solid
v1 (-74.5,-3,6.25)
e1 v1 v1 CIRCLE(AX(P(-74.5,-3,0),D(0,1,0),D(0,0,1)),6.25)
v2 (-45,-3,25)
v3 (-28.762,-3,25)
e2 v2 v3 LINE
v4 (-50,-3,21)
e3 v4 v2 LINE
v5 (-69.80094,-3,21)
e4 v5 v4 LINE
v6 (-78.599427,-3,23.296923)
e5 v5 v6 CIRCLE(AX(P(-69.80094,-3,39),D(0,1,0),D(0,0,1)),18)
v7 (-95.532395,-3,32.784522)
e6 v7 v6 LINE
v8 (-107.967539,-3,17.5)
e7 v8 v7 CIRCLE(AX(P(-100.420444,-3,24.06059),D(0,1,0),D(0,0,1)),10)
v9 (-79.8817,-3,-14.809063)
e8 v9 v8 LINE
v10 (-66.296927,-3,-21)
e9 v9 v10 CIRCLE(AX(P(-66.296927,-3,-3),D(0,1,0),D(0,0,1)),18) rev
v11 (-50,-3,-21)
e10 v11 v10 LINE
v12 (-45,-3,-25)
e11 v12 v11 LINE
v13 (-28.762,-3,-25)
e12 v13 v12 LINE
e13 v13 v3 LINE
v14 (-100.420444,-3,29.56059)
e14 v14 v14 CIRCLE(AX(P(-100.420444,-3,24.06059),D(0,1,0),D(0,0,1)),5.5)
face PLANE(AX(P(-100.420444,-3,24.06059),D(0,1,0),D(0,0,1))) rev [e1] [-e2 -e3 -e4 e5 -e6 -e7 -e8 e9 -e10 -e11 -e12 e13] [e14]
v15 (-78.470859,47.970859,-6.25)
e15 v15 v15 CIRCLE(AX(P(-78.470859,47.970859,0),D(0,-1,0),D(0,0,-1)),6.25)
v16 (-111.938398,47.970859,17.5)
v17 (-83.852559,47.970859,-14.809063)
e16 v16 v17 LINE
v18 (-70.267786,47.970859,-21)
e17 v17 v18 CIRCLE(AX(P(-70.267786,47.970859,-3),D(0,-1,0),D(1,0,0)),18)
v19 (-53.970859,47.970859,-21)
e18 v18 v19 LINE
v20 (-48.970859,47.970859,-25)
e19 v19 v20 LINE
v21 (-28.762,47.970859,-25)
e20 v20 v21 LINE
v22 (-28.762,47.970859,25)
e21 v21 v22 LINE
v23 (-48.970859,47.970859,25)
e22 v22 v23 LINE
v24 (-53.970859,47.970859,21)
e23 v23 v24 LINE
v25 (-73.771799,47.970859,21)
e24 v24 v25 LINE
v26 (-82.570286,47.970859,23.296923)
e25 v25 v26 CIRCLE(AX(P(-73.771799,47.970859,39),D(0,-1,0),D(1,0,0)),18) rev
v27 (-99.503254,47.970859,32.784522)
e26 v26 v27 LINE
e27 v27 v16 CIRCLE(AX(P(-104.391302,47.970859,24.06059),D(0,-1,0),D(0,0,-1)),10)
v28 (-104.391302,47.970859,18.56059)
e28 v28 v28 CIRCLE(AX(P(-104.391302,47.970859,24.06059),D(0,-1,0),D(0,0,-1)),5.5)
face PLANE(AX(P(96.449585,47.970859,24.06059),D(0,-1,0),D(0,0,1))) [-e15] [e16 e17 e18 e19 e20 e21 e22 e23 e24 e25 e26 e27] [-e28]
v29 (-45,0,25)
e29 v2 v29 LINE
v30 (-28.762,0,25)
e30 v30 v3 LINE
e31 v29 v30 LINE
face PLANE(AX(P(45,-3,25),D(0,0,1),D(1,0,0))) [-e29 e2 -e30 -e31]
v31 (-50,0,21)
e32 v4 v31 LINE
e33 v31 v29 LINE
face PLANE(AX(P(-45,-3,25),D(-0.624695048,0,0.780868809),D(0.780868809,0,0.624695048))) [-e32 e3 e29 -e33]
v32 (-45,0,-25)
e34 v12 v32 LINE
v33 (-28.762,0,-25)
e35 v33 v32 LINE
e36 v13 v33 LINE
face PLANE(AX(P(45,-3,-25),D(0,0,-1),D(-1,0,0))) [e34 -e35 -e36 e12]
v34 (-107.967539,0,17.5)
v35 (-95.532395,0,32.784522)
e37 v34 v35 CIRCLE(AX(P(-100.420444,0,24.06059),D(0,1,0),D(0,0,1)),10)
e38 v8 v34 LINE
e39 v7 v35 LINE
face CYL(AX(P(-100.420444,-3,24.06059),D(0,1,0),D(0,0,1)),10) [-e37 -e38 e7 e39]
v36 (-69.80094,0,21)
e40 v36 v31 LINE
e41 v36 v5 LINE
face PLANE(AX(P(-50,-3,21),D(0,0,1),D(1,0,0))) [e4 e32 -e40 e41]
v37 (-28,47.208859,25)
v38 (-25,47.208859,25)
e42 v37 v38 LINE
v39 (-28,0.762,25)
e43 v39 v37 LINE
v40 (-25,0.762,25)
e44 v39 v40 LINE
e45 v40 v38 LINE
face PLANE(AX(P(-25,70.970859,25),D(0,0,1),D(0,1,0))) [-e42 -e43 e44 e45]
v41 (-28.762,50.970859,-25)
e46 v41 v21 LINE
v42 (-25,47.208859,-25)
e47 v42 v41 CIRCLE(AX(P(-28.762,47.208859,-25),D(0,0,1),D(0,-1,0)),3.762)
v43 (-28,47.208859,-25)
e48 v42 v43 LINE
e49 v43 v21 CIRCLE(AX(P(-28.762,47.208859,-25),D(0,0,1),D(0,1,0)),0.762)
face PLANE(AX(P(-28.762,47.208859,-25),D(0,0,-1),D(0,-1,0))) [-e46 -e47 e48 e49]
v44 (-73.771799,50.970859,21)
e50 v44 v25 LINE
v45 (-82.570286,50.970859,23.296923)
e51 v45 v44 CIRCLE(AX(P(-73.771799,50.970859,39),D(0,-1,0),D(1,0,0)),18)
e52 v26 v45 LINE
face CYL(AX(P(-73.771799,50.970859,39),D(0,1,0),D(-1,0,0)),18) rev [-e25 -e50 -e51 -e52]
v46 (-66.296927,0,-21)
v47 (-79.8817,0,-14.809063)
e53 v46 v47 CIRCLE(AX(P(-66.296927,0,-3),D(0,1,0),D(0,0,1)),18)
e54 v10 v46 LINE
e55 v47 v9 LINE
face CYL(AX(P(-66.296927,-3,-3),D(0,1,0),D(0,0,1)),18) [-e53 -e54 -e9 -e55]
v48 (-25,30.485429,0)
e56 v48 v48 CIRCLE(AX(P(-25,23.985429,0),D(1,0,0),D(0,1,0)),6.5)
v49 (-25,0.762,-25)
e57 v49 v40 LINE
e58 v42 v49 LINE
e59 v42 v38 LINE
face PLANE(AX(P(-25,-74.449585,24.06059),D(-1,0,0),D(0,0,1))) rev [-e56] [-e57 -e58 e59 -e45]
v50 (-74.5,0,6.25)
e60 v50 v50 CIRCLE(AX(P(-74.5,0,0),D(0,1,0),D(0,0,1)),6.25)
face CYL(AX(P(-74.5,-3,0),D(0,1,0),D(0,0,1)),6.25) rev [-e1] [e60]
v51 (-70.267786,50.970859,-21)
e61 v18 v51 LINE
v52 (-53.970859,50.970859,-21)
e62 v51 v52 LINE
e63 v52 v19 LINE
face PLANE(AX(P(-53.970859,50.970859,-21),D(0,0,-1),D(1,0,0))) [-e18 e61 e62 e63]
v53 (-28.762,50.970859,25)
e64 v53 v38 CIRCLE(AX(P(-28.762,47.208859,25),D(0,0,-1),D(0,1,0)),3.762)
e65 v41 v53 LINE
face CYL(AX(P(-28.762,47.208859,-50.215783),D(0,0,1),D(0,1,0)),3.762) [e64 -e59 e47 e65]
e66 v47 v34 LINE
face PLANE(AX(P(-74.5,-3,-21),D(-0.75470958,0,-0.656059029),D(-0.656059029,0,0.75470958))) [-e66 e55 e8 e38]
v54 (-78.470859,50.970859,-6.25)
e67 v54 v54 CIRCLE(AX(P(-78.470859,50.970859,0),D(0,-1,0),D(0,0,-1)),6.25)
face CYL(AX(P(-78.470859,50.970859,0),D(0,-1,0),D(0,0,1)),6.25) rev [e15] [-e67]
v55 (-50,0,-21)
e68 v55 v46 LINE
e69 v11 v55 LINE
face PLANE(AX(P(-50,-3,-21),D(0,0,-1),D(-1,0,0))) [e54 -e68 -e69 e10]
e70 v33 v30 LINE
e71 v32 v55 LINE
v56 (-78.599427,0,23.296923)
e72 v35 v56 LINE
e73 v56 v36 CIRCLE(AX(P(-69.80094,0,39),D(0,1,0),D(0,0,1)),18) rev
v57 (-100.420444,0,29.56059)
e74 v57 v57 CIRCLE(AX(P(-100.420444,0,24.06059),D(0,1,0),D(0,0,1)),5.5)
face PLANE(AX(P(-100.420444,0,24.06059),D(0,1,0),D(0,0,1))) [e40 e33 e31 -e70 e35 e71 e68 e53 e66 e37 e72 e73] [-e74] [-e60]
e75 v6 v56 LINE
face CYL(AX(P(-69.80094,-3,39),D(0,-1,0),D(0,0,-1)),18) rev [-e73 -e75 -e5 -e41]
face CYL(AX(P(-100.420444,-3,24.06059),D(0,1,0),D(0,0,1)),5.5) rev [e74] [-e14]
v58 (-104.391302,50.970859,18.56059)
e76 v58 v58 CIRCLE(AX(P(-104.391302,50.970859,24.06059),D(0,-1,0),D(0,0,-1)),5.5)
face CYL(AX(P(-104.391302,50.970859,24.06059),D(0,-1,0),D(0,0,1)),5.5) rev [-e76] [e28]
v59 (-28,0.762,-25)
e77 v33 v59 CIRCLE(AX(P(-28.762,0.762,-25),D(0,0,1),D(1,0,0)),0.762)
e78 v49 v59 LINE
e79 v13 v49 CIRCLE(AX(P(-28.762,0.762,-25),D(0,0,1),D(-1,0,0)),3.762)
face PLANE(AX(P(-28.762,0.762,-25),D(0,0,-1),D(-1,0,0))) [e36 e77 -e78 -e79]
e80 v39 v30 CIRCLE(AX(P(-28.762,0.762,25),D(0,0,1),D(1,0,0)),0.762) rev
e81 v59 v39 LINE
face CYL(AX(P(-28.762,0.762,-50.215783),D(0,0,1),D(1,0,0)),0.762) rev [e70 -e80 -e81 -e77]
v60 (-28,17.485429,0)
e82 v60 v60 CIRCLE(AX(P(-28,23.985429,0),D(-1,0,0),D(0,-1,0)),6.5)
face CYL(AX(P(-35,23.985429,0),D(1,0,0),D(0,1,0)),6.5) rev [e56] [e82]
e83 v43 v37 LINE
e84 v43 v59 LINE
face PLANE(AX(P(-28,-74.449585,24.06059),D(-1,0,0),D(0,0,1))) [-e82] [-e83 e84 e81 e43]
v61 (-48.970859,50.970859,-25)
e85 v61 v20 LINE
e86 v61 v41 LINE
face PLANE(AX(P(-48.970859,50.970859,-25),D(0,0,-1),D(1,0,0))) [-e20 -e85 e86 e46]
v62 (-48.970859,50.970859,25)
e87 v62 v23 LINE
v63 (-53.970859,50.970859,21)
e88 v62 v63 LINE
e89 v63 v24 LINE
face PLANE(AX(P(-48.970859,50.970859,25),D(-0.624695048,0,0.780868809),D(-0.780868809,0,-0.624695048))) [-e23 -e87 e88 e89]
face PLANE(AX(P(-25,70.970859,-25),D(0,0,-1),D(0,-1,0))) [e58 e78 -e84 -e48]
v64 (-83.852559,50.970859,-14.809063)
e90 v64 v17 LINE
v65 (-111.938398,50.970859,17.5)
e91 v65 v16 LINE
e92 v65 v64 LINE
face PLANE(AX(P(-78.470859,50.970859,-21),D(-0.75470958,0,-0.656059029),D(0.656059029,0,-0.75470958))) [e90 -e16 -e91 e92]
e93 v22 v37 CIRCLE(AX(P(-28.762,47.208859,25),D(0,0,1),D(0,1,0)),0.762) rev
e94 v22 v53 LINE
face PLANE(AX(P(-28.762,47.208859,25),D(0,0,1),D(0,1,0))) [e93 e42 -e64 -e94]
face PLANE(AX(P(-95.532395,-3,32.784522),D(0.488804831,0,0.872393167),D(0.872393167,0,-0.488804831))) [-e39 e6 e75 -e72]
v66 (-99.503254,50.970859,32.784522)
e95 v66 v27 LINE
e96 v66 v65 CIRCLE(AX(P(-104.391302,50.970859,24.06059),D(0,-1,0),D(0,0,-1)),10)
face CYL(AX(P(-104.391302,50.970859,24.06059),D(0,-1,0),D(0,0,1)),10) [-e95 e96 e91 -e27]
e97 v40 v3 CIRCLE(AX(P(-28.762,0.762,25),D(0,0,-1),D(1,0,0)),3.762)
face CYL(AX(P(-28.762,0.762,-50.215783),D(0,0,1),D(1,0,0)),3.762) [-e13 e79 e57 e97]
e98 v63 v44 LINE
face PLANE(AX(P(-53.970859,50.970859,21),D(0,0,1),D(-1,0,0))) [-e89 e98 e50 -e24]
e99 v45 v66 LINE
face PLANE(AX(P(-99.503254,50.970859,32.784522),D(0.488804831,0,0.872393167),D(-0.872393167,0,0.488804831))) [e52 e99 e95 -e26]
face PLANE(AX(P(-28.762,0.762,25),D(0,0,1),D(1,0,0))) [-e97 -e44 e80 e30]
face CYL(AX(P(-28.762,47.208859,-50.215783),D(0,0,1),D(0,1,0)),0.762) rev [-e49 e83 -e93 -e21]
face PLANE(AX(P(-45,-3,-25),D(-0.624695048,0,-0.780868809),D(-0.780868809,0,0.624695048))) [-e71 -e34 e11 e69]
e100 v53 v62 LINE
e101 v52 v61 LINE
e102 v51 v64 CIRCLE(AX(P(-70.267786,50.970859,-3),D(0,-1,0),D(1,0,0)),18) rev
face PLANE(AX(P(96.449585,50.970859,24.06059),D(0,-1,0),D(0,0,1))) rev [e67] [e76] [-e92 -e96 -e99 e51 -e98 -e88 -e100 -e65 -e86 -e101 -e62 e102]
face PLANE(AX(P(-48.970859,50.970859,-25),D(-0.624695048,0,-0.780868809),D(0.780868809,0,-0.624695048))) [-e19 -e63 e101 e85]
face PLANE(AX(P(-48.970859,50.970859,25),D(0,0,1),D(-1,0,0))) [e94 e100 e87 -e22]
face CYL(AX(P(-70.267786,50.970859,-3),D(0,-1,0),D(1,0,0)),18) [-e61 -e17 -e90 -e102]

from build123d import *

# Parameters (mm, degrees)
SKETCH1_R                    = 5.5
SKETCH1_R_2                  = 6.25
BASE_FLANGE1_DEPTH           = 3
SKETCHED_START               = -3
SKETCHED_BEND1_OUTLINE_R     = 5.5
SKETCHED_BEND1_OUTLINE_R_2   = 6.25
SKETCHED_BEND1_DEPTH         = 3
SKETCHED_START_2             = 0.762
SKETCHED_BEND1_2_OUTLINE_W   = 3
SKETCHED_BEND1_2_OUTLINE_H   = 50
SKETCHED_BEND1_2_DEPTH       = 46.446858709
SKETCHED_START_3             = 47.208858709
SKETCHED_BEND1_3_OUTLINE_R   = 5.5
SKETCHED_BEND1_3_OUTLINE_R_2 = 6.25
SKETCHED_BEND1_3_DEPTH       = 3.762
SKETCHED_BEND1_4_OUTLINE_R   = 5.5
SKETCHED_BEND1_4_OUTLINE_R_2 = 6.25
SKETCHED_BEND1_4_DEPTH       = 0.762
SKETCHED_START_4             = -26
SKETCHED_BEND1_5_DEPTH       = 61
FILLET1_R                    = 18
SKETCH7_R                    = 6.5
CUT_EXTRUDE1_DEPTH           = 10


with BuildPart() as part:
    # Base-Flange1: sheet metal written as solids
    # Sketch1 → Base-Flange1 (new body)
    with BuildSketch(Plane(origin=(0, 0, 0), x_dir=(1, 0, 0), z_dir=(0, 1, 0))):
        with BuildLine():
            Line((45, 25), (-45, 25))
            Line((-45, 25), (-50, 21))
            Line((-50, 21), (-74.5, 21))
            Line((-74.5, 21), (-107.967539406, -17.5))
            ThreePointArc((-107.967539406, -17.5), (-108.177491125, -30.371550102), (-95.532395294, -32.784521956))
            Line((-95.532395294, -32.784521956), (-74.5, -21))
            Line((-74.5, -21), (-50, -21))
            Line((-50, -21), (-45, -25))
            Line((-45, -25), (45, -25))
            Line((45, -25), (50, -21))
            Line((50, -21), (74.5, -21))
            Line((74.5, -21), (95.532395294, -32.784521956))
            ThreePointArc((95.532395294, -32.784521956), (108.177491125, -30.371550102), (107.967539406, -17.5))
            Line((107.967539406, -17.5), (74.5, 21))
            Line((74.5, 21), (50, 21))
            Line((50, 21), (45, 25))
        make_face()
        with Locations(Location((-100.420443604, -24.06059029, 0), (0, 0, 270))):
            Circle(SKETCH1_R, mode=Mode.SUBTRACT)
        with Locations(Location((-74.5, 0, 0), (0, 0, 270))):
            Circle(SKETCH1_R_2, mode=Mode.SUBTRACT)
        with Locations(Location((74.5, 0, 0), (0, 0, 90))):
            Circle(SKETCH1_R_2, mode=Mode.SUBTRACT)
        with Locations(Location((100.420443604, -24.06059029, 0), (0, 0, 90))):
            Circle(SKETCH1_R, mode=Mode.SUBTRACT)
    extrude(amount=-BASE_FLANGE1_DEPTH)

    # Sketched Bend1: read off the stored shape, not the designer's step
    # Sketched Bend1 outline → Sketched Bend1 (cut)
    with BuildSketch(Plane(origin=(0, 0, 0), x_dir=(1, 0, 0), z_dir=(0, 1, 0)).offset(SKETCHED_START)):
        with BuildLine():
            Line((45, 25), (-25, 25))
            Line((-25, 25), (-25, -25))
            Line((-25, -25), (45, -25))
            Line((45, -25), (50, -21))
            Line((50, -21), (74.5, -21))
            Line((74.5, -21), (95.532395294, -32.784521956))
            ThreePointArc((95.532395294, -32.784521956), (108.177491125, -30.371550102), (107.967539406, -17.5))
            Line((107.967539406, -17.5), (74.5, 21))
            Line((74.5, 21), (50, 21))
            Line((50, 21), (45, 25))
        make_face()
        with Locations((100.420443604, -24.06059029)):
            Circle(SKETCHED_BEND1_OUTLINE_R, mode=Mode.SUBTRACT)
        with Locations((74.5, 0)):
            Circle(SKETCHED_BEND1_OUTLINE_R_2, mode=Mode.SUBTRACT)
    extrude(amount=SKETCHED_BEND1_DEPTH, mode=Mode.SUBTRACT)



with BuildPart() as body_2:
    # Sketched Bend1 2 outline → Sketched Bend1 2 (new body)
    with BuildSketch(Plane(origin=(0, 0, 0), x_dir=(1, 0, 0), z_dir=(0, 1, 0)).offset(SKETCHED_START_2)):
        with Locations((-26.5, 0)):
            Rectangle(SKETCHED_BEND1_2_OUTLINE_W, SKETCHED_BEND1_2_OUTLINE_H)
    extrude(amount=SKETCHED_BEND1_2_DEPTH)

    # Sketched Bend1 3 outline → Sketched Bend1 3 (add)
    with BuildSketch(Plane(origin=(0, 0, 0), x_dir=(1, 0, 0), z_dir=(0, 1, 0)).offset(SKETCHED_START_3)):
        with BuildLine():
            Line((-25, -25), (-25, 25))
            Line((-25, 25), (-48.970858709, 25))
            Line((-48.970858709, 25), (-53.970858709, 21))
            Line((-53.970858709, 21), (-78.470858709, 21))
            Line((-78.470858709, 21), (-111.938398115, -17.5))
            ThreePointArc((-111.938398115, -17.5), (-112.148349834, -30.371550102), (-99.503254003, -32.784521956))
            Line((-99.503254003, -32.784521956), (-78.470858709, -21))
            Line((-78.470858709, -21), (-53.970858709, -21))
            Line((-53.970858709, -21), (-48.970858709, -25))
            Line((-48.970858709, -25), (-25, -25))
        make_face()
        with Locations((-104.391302312, -24.06059029)):
            Circle(SKETCHED_BEND1_3_OUTLINE_R, mode=Mode.SUBTRACT)
        with Locations((-78.470858709, 0)):
            Circle(SKETCHED_BEND1_3_OUTLINE_R_2, mode=Mode.SUBTRACT)
    extrude(amount=SKETCHED_BEND1_3_DEPTH)


with BuildPart() as part_1:
    add(part.part)

    add(body_2.part)  # Sketched Bend1 4 merges body 2
    # Sketched Bend1 4 outline → Sketched Bend1 4 (add)
    with BuildSketch(Plane(origin=(0, 0, 0), x_dir=(1, 0, 0), z_dir=(0, 1, 0))):
        with BuildLine():
            Line((-25, -25), (-25, 25))
            Line((-25, 25), (-48.970858709, 25))
            Line((-48.970858709, 25), (-53.970858709, 21))
            Line((-53.970858709, 21), (-78.470858709, 21))
            Line((-78.470858709, 21), (-111.938398115, -17.5))
            ThreePointArc((-111.938398115, -17.5), (-112.148349834, -30.371550102), (-99.503254003, -32.784521956))
            Line((-99.503254003, -32.784521956), (-78.470858709, -21))
            Line((-78.470858709, -21), (-53.970858709, -21))
            Line((-53.970858709, -21), (-48.970858709, -25))
            Line((-48.970858709, -25), (-25, -25))
        make_face()
        with Locations((-104.391302312, -24.06059029)):
            Circle(SKETCHED_BEND1_4_OUTLINE_R, mode=Mode.SUBTRACT)
        with Locations((-78.470858709, 0)):
            Circle(SKETCHED_BEND1_4_OUTLINE_R_2, mode=Mode.SUBTRACT)
    extrude(amount=SKETCHED_BEND1_4_DEPTH)

    # Sketched Bend1 5 outline → Sketched Bend1 5 (cut)
    with BuildSketch(Plane.XY.offset(SKETCHED_START_4)):
        with BuildLine():
            ThreePointArc((-28.762, 50.970858709), (-26.101864289, 49.86899442), (-25, 47.208858709))
            Line((-25, 47.208858709), (-25.000000008, 52))
            Line((-25.000000008, 52), (-116, 52))
            Line((-116, 52), (-116, 50.970858695))
            Line((-116, 50.970858695), (-28.762, 50.970858709))
        make_face()
        with BuildLine():
            ThreePointArc((-25, 0.762), (-26.101864289, -1.898135711), (-28.762, -3))
            Line((-28.762, -3), (-116, -2.999999986))
            Line((-116, -2.999999986), (-116, -4))
            Line((-116, -4), (-25.000000008, -4))
            Line((-25.000000008, -4), (-25, 0.762))
        make_face()
        with BuildLine():
            Line((-28.762, 47.970858709), (-116, 47.970858709))
            Line((-116, 47.970858709), (-116, 47.208858709))
            Line((-116, 47.208858709), (-28, 47.208858709))
            ThreePointArc((-28, 47.208858709), (-28.223184633, 47.747674076), (-28.762, 47.970858709))
        make_face()
        with BuildLine():
            Line((-116, 0), (-28.762, 0))
            ThreePointArc((-28.762, 0), (-28.223184633, 0.223184633), (-28, 0.762))
            Line((-28, 0.762), (-116, 0.762))
            Line((-116, 0.762), (-116, 0))
        make_face()
    extrude(amount=SKETCHED_BEND1_5_DEPTH, mode=Mode.SUBTRACT)

    # Fillet1
    fillet1_edges = [part_1.edges().sort_by_distance(p)[0] for p in [
        (-78.470858709, 49.470858709, 21),
        (-78.470858709, 49.470858709, -21),
        (-74.5, -1.5, -21),
        (-74.5, -1.5, 21),
    ]]
    fillet(fillet1_edges, radius=FILLET1_R)

    # Sketch7 → Cut-Extrude1 (cut)
    with BuildSketch(Plane(origin=(-25, 0, 0), x_dir=(0, 0, -1), z_dir=(1, 0, 0))):
        with Locations(Location((0, 23.985429354, 0), (0, 0, 90))):
            Circle(SKETCH7_R)
    extrude(amount=-CUT_EXTRUDE1_DEPTH, mode=Mode.SUBTRACT)


solid = part_1.part
